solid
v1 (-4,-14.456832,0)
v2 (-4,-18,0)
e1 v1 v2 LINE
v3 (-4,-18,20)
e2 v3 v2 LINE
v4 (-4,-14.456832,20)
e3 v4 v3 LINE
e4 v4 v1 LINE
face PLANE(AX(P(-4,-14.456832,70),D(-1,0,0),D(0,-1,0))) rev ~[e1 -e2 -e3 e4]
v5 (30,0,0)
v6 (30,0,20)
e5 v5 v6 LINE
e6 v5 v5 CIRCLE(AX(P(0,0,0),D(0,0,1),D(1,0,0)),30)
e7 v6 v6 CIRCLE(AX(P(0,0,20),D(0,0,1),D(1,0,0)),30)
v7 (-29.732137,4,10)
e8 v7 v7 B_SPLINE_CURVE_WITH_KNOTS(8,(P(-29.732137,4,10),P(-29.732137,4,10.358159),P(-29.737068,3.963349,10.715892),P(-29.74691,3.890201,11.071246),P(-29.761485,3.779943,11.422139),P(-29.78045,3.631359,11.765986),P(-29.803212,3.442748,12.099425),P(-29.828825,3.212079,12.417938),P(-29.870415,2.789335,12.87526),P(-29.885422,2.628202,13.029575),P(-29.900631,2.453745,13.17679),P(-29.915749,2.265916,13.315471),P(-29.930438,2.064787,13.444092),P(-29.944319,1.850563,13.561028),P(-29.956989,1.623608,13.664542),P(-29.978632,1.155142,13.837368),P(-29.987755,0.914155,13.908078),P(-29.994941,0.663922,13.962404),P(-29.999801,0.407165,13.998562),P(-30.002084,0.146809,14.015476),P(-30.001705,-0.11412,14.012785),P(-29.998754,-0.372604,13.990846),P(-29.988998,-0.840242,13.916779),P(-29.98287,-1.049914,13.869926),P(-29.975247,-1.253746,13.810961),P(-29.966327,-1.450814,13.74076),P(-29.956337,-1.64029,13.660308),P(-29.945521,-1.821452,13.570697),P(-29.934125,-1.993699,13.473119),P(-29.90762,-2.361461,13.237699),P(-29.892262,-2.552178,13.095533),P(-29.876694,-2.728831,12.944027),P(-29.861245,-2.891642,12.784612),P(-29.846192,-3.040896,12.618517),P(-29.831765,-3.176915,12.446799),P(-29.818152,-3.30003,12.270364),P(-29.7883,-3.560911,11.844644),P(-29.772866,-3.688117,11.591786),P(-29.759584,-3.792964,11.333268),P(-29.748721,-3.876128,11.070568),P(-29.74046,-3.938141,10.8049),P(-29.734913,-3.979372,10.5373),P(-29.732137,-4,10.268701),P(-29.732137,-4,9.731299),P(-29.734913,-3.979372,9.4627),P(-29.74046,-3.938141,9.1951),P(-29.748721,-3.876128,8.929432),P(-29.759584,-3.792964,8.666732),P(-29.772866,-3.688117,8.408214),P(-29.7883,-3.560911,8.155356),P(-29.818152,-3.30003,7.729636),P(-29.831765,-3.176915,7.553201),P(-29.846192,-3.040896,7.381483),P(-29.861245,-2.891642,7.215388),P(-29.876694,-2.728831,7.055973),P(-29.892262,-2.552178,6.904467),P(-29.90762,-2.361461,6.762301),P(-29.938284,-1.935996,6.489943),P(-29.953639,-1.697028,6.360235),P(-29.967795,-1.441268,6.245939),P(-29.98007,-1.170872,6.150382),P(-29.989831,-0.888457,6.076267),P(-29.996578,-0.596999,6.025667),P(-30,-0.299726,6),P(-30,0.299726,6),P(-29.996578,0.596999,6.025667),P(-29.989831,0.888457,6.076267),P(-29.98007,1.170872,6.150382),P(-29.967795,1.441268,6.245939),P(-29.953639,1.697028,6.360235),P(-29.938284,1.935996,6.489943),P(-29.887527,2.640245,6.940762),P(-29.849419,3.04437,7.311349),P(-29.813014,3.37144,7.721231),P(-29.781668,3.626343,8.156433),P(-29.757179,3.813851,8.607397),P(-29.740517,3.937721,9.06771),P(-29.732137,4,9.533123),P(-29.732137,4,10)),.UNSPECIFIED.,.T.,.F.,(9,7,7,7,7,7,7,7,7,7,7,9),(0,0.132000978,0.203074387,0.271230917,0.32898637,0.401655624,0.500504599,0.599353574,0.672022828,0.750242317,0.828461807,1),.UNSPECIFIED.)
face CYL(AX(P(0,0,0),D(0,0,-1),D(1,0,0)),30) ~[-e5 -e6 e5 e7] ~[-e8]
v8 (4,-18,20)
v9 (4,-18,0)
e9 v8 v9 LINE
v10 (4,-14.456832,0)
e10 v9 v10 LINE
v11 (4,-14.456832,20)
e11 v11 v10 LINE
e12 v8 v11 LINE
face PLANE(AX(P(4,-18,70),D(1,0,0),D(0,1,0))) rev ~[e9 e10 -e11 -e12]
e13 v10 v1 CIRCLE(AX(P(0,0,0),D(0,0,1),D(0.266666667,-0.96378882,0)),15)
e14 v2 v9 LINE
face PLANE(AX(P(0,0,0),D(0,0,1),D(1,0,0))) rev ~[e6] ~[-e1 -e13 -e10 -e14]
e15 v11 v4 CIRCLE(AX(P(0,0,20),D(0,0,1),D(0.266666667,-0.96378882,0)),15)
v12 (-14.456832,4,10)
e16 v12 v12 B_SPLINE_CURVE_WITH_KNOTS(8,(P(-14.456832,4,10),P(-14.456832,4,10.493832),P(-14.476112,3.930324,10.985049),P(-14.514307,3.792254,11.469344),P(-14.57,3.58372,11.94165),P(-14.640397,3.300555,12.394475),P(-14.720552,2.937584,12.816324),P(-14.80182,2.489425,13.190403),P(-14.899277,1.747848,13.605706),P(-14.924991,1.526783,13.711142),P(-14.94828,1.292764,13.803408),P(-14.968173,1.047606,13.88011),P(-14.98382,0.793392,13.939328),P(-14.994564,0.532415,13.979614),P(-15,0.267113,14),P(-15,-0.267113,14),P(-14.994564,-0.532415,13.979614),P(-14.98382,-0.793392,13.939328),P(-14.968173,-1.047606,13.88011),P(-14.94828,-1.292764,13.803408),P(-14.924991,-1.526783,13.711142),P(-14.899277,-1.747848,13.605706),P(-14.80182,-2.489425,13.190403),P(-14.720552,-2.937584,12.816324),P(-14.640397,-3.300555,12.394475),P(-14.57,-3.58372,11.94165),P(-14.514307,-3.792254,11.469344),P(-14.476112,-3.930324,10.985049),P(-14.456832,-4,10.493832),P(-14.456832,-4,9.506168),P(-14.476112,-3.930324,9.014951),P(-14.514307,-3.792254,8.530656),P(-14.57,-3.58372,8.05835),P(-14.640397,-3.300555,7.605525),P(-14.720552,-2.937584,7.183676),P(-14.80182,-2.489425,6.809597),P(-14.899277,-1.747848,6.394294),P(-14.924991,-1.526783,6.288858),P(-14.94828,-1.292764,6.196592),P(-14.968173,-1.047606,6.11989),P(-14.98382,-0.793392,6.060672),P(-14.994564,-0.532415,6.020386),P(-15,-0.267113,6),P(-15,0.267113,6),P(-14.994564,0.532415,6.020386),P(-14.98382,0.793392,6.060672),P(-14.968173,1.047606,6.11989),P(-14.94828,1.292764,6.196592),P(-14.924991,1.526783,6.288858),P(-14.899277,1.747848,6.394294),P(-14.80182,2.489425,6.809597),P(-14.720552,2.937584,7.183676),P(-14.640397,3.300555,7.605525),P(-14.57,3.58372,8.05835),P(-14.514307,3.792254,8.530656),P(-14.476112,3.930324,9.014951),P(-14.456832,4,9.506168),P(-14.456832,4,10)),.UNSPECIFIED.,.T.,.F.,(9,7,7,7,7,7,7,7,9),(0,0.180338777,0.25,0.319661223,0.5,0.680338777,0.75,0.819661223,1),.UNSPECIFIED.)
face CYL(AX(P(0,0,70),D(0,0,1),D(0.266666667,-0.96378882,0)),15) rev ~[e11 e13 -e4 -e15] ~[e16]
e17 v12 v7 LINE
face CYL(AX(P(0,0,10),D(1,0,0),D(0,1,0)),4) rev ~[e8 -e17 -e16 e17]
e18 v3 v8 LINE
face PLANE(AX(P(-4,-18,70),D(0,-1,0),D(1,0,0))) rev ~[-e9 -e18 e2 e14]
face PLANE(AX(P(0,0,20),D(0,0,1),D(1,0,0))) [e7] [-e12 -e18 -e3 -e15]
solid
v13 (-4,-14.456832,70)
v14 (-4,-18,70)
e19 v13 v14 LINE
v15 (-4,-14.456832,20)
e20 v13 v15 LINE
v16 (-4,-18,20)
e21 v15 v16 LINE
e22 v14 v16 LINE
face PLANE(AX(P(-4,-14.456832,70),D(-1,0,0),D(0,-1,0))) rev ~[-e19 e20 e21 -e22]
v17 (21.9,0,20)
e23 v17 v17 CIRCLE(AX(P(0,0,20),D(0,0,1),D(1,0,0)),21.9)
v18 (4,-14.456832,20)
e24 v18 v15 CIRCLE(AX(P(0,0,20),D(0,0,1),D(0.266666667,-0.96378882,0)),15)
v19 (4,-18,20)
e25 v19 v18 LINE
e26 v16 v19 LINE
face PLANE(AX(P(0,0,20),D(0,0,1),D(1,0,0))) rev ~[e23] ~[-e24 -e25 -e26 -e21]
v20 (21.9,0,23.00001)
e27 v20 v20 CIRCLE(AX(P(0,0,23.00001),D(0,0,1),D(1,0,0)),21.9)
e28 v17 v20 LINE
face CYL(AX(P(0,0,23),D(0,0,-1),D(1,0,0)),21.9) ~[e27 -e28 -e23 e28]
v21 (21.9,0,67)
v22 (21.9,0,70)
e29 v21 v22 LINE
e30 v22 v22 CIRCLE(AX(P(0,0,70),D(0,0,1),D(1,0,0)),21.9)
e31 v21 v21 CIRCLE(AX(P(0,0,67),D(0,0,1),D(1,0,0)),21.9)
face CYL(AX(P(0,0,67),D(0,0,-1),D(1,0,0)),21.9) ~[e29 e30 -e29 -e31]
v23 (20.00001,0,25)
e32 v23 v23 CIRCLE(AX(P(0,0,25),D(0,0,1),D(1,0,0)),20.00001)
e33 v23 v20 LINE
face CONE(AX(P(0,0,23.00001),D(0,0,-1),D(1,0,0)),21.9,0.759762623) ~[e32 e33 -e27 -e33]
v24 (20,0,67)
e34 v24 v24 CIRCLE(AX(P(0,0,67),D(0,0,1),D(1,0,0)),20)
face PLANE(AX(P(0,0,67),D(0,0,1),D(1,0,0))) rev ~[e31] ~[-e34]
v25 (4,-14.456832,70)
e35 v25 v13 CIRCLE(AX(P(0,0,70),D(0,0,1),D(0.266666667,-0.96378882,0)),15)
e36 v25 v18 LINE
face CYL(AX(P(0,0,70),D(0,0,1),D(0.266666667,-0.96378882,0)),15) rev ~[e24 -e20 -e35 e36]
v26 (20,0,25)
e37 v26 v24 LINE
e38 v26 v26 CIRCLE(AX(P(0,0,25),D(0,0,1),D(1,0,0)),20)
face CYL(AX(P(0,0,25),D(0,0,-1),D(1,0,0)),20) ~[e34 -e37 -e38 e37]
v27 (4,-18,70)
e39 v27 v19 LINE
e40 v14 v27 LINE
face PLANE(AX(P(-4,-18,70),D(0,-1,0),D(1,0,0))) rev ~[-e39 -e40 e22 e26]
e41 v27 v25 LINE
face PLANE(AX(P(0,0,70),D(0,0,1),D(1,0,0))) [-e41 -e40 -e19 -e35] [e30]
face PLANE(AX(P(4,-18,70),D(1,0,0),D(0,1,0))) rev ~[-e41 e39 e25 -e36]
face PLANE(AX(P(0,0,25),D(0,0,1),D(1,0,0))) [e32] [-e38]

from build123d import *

# Parameters (mm, degrees)
F0_R      = 30
F1_DEPTH  = 20
F3_R      = 21.9
F4_DEPTH  = 3
F6_R      = 21.9
F7_DEPTH  = 2
F9_R      = 20
F10_DEPTH = 42
F12_R     = 21.9
F13_DEPTH = 3
F15_R     = 4
F16_DEPTH = 63.4
F18_DEPTH = 171
F19_SIZE2 = 1.99999
F19_SIZE  = 1.89999


# Not quite as in the source:
# - a fillet or chamfer is up to 0.001 mm smaller than in the source, because OpenCascade refuses the exact size


with BuildPart() as f1:
    # F0 (on Top) → F1 (new body)
    with BuildSketch(Plane.XY):
        Circle(F0_R)
    extrude(amount=F1_DEPTH)

    # F15 (on Right) → F16 (cut)
    with BuildSketch(Plane.YZ):
        with Locations((0, 10)):
            Circle(F15_R)
    extrude(amount=-F16_DEPTH, mode=Mode.SUBTRACT)


with BuildPart() as f4:
    # F3 (on offset) → F4 (new body)
    with BuildSketch(Plane.XY.offset(20)):
        Circle(F3_R)
    extrude(amount=F4_DEPTH)

    # F6 (on offset) → F7 (join)
    with BuildSketch(Plane.XY.offset(23)):
        Circle(F6_R)
    extrude(amount=F7_DEPTH)

    # F9 (on offset) → F10 (join)
    with BuildSketch(Plane.XY.offset(25)):
        Circle(F9_R)
    extrude(amount=F10_DEPTH)

    # F12 (on offset) → F13 (join)
    with BuildSketch(Plane.XY.offset(67)):
        Circle(F12_R)
    extrude(amount=F13_DEPTH)


with BuildPart() as f18_tool:
    # F17 (on offset) → F18 (new body)
    with BuildSketch(Plane.XY.offset(70)):
        with BuildLine():
            Line((4, -18), (4, -14.4568322948))
            ThreePointArc((4, -14.4568322948), (0, 15), (-4, -14.4568322948))
            Line((-4, -14.4568322948), (-4, -18))
            Line((-4, -18), (4, -18))
        make_face()
    extrude(amount=-F18_DEPTH)


with BuildPart() as f1_1:
    add(f1.part)

    # F18: cut by f18_tool
    add(f18_tool.part, mode=Mode.SUBTRACT)


with BuildPart() as f4_1:
    add(f4.part)

    # F18: cut by f18_tool
    add(f18_tool.part, mode=Mode.SUBTRACT)

    # F19 (size 1.9 and 2 in the source; OpenCascade refuses exactly that, so slightly less here)
    f19_edges = [f4_1.edges().sort_by_distance(p)[0] for p in [
        (-21.9, 0, 25),
    ]]
    f19_side = f4_1.faces().sort_by_distance((-21.280574, 0, 25))[0]
    chamfer(f19_edges, length=F19_SIZE, length2=F19_SIZE2, reference=f19_side)


solid = Compound([f1_1.part, f4_1.part])
